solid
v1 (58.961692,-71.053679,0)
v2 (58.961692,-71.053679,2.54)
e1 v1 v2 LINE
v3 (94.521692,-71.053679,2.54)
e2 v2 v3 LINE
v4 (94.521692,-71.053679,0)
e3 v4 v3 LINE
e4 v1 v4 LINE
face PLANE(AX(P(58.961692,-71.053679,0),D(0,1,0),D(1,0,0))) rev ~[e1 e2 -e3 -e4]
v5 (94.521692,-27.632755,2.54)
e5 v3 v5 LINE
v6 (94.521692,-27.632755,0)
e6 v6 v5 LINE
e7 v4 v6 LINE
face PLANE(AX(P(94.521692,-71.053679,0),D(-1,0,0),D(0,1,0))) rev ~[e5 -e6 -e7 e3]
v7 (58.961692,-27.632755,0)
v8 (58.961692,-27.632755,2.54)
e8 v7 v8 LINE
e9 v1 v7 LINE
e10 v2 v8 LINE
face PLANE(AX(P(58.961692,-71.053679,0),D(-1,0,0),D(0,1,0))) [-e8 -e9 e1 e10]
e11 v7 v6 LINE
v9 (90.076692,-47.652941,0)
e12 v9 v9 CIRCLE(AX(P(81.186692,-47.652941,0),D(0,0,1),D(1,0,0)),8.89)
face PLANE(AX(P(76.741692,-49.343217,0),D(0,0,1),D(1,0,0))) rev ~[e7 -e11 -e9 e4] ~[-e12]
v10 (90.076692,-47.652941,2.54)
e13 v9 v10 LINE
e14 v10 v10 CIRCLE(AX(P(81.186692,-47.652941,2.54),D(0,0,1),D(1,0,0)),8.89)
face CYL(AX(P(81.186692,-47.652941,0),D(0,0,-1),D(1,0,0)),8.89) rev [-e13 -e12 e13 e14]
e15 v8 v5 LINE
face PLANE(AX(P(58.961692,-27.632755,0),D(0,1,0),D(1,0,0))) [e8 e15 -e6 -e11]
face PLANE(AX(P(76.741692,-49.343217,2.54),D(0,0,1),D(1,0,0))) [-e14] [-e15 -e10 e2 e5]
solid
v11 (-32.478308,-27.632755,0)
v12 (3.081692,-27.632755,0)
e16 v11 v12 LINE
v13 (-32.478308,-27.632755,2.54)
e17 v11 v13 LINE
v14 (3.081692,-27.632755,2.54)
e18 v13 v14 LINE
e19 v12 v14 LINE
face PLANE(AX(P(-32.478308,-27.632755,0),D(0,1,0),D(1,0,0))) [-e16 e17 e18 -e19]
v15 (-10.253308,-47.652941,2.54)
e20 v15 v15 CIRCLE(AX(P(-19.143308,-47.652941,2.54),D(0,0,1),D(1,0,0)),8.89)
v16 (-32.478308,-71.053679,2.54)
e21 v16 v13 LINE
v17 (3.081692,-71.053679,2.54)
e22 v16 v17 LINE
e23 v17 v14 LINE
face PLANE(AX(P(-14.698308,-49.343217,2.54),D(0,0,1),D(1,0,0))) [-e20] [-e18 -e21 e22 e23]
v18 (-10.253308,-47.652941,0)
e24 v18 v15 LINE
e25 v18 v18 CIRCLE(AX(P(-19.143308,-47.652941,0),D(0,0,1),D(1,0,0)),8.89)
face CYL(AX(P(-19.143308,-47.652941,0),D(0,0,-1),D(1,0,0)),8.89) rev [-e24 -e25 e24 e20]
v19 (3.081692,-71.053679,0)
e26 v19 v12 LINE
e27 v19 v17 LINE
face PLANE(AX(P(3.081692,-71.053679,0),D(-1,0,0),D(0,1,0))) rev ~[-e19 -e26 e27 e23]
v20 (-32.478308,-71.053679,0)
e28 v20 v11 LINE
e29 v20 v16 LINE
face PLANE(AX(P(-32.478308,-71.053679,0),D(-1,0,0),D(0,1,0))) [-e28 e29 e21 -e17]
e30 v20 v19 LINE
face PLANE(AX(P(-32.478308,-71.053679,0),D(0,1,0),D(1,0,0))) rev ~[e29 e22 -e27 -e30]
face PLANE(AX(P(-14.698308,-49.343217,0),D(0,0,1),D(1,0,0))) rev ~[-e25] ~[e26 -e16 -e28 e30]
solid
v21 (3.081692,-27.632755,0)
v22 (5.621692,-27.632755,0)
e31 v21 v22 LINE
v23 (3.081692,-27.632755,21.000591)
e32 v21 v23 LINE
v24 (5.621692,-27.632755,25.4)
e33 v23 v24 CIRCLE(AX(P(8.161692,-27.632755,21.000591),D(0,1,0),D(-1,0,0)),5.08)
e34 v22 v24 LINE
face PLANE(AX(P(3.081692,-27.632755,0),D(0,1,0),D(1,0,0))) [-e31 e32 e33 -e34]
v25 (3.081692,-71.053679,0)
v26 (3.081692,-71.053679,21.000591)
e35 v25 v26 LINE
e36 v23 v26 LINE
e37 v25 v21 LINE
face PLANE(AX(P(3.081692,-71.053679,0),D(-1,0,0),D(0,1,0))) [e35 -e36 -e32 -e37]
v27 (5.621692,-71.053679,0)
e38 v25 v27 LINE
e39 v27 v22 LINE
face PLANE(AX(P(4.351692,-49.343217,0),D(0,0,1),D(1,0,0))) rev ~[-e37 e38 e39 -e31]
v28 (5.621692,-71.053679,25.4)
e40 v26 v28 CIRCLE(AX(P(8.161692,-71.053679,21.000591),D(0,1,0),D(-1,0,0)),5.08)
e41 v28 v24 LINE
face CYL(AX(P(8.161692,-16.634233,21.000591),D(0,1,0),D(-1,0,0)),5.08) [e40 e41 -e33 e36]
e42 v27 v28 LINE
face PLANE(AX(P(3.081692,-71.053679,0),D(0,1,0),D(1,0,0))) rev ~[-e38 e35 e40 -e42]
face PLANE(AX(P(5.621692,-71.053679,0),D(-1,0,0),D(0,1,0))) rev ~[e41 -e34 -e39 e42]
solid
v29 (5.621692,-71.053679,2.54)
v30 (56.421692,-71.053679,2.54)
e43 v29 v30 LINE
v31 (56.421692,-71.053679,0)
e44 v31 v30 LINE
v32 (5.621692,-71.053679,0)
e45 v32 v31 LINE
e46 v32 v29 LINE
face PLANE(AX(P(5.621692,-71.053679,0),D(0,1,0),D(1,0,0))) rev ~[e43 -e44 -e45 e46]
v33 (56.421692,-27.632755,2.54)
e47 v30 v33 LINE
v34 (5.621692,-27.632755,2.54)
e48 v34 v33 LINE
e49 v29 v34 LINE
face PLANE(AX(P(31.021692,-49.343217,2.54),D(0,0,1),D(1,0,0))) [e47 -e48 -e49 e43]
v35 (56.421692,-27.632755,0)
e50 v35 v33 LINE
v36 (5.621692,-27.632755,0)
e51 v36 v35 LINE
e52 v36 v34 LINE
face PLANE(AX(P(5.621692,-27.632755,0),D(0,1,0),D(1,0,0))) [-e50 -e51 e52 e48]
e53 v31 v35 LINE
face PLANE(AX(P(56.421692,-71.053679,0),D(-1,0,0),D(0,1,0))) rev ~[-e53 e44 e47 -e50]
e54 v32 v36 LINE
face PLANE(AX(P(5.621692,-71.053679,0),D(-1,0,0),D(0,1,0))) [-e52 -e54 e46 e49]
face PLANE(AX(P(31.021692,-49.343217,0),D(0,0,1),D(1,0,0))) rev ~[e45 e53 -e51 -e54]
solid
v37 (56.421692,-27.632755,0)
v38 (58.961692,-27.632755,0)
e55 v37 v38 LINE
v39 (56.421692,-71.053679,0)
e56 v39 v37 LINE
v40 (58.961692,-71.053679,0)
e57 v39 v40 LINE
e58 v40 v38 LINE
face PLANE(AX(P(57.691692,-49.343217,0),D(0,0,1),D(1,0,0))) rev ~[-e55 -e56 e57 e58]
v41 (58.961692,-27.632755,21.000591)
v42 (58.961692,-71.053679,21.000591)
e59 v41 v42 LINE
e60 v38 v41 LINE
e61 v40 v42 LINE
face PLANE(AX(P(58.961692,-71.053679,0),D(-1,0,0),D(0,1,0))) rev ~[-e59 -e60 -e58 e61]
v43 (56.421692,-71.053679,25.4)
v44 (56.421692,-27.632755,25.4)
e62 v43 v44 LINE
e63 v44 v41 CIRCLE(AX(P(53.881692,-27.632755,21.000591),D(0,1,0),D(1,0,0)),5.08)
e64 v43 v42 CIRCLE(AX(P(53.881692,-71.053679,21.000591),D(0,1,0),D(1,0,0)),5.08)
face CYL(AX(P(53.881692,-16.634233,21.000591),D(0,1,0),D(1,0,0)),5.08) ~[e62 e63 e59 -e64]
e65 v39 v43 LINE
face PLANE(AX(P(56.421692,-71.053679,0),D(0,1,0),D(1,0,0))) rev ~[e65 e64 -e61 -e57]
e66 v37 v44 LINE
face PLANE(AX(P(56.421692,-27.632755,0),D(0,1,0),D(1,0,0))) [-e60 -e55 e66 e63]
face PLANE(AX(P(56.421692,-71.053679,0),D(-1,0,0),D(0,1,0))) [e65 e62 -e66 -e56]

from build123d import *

# Parameters (mm, degrees)
F0_W          = 2.54
F0_H          = 43.4209238519
F1_DEPTH      = 25.4
F0_W_2        = 35.56
F0_R          = 8.89
F2_DEPTH      = 2.54
F0_W_3        = 50.8
F3_T1_DEPTH   = 65.417969108
F3_2_T1_DEPTH = 65.417969108


# Not quite as in the source:
# - a fillet or chamfer that OpenCascade refuses, or shapes differently, is made with other operations: its cross-section is extruded or revolved along the edge and cut away or added


with BuildPart() as f1:
    # F0 (on Top) → F1 (new body)
    with BuildSketch(Plane.XY):
        with Locations((4.3516923602, -49.3432171643)):
            Rectangle(F0_W, F0_H)
    extrude(amount=F1_DEPTH)

    # F3: fillet of radius 5.08 on 1 edges, made by hand

    # F3_s2 → F3_t1 (cut)
    with BuildSketch(Plane.XZ.offset(16.6342326103)):
        with BuildLine():
            ThreePointArc((3.0816923602, 21.0005909488), (3.762283309, 23.5405909488), (5.6216923602, 25.4))
            Line((5.6216923602, 25.4), (3.0816923602, 25.4))
            Line((3.0816923602, 25.4), (3.0816923602, 21.0005909488))
        make_face()
    extrude(amount=F3_T1_DEPTH, mode=Mode.SUBTRACT)


with BuildPart() as f1b:
    # F0 (on Top) → F1, piece 2 (new body)
    with BuildSketch(Plane.XY):
        with Locations((57.6916923602, -49.3432171643)):
            Rectangle(F0_W, F0_H)
    extrude(amount=F1_DEPTH)

    # F3#2: fillet of radius 5.08 on 1 edges, made by hand

    # F3_2_s2 → F3_2_t1 (cut)
    with BuildSketch(Plane.XZ.offset(16.6342326103)):
        with BuildLine():
            ThreePointArc((58.9616923602, 21.0005909488), (58.2811014114, 23.5405909488), (56.4216923602, 25.4))
            Line((56.4216923602, 25.4), (58.9616923602, 25.4))
            Line((58.9616923602, 25.4), (58.9616923602, 21.0005909488))
        make_face()
    extrude(amount=F3_2_T1_DEPTH, mode=Mode.SUBTRACT)


with BuildPart() as f2:
    # F0 (on Top) → F2 (new body)
    with BuildSketch(Plane.XY):
        with Locations((-14.6983076398, -49.3432171643)):
            Rectangle(F0_W_2, F0_H)
        with Locations((-19.1433076398, -47.6529405909)):
            Circle(F0_R, mode=Mode.SUBTRACT)
    extrude(amount=F2_DEPTH)


with BuildPart() as f2b:
    # F0 (on Top) → F2, piece 2 (new body)
    with BuildSketch(Plane.XY):
        with Locations((31.0216923602, -49.3432171643)):
            Rectangle(F0_W_3, F0_H)
    extrude(amount=F2_DEPTH)


with BuildPart() as f2c:
    # F0 (on Top) → F2, piece 3 (new body)
    with BuildSketch(Plane.XY):
        with Locations((76.7416923602, -49.3432171643)):
            Rectangle(F0_W_2, F0_H)
        with Locations((81.1866923602, -47.6529405909)):
            Circle(F0_R, mode=Mode.SUBTRACT)
    extrude(amount=F2_DEPTH)


solid = Compound([f1.part, f1b.part, f2.part, f2b.part, f2c.part])
